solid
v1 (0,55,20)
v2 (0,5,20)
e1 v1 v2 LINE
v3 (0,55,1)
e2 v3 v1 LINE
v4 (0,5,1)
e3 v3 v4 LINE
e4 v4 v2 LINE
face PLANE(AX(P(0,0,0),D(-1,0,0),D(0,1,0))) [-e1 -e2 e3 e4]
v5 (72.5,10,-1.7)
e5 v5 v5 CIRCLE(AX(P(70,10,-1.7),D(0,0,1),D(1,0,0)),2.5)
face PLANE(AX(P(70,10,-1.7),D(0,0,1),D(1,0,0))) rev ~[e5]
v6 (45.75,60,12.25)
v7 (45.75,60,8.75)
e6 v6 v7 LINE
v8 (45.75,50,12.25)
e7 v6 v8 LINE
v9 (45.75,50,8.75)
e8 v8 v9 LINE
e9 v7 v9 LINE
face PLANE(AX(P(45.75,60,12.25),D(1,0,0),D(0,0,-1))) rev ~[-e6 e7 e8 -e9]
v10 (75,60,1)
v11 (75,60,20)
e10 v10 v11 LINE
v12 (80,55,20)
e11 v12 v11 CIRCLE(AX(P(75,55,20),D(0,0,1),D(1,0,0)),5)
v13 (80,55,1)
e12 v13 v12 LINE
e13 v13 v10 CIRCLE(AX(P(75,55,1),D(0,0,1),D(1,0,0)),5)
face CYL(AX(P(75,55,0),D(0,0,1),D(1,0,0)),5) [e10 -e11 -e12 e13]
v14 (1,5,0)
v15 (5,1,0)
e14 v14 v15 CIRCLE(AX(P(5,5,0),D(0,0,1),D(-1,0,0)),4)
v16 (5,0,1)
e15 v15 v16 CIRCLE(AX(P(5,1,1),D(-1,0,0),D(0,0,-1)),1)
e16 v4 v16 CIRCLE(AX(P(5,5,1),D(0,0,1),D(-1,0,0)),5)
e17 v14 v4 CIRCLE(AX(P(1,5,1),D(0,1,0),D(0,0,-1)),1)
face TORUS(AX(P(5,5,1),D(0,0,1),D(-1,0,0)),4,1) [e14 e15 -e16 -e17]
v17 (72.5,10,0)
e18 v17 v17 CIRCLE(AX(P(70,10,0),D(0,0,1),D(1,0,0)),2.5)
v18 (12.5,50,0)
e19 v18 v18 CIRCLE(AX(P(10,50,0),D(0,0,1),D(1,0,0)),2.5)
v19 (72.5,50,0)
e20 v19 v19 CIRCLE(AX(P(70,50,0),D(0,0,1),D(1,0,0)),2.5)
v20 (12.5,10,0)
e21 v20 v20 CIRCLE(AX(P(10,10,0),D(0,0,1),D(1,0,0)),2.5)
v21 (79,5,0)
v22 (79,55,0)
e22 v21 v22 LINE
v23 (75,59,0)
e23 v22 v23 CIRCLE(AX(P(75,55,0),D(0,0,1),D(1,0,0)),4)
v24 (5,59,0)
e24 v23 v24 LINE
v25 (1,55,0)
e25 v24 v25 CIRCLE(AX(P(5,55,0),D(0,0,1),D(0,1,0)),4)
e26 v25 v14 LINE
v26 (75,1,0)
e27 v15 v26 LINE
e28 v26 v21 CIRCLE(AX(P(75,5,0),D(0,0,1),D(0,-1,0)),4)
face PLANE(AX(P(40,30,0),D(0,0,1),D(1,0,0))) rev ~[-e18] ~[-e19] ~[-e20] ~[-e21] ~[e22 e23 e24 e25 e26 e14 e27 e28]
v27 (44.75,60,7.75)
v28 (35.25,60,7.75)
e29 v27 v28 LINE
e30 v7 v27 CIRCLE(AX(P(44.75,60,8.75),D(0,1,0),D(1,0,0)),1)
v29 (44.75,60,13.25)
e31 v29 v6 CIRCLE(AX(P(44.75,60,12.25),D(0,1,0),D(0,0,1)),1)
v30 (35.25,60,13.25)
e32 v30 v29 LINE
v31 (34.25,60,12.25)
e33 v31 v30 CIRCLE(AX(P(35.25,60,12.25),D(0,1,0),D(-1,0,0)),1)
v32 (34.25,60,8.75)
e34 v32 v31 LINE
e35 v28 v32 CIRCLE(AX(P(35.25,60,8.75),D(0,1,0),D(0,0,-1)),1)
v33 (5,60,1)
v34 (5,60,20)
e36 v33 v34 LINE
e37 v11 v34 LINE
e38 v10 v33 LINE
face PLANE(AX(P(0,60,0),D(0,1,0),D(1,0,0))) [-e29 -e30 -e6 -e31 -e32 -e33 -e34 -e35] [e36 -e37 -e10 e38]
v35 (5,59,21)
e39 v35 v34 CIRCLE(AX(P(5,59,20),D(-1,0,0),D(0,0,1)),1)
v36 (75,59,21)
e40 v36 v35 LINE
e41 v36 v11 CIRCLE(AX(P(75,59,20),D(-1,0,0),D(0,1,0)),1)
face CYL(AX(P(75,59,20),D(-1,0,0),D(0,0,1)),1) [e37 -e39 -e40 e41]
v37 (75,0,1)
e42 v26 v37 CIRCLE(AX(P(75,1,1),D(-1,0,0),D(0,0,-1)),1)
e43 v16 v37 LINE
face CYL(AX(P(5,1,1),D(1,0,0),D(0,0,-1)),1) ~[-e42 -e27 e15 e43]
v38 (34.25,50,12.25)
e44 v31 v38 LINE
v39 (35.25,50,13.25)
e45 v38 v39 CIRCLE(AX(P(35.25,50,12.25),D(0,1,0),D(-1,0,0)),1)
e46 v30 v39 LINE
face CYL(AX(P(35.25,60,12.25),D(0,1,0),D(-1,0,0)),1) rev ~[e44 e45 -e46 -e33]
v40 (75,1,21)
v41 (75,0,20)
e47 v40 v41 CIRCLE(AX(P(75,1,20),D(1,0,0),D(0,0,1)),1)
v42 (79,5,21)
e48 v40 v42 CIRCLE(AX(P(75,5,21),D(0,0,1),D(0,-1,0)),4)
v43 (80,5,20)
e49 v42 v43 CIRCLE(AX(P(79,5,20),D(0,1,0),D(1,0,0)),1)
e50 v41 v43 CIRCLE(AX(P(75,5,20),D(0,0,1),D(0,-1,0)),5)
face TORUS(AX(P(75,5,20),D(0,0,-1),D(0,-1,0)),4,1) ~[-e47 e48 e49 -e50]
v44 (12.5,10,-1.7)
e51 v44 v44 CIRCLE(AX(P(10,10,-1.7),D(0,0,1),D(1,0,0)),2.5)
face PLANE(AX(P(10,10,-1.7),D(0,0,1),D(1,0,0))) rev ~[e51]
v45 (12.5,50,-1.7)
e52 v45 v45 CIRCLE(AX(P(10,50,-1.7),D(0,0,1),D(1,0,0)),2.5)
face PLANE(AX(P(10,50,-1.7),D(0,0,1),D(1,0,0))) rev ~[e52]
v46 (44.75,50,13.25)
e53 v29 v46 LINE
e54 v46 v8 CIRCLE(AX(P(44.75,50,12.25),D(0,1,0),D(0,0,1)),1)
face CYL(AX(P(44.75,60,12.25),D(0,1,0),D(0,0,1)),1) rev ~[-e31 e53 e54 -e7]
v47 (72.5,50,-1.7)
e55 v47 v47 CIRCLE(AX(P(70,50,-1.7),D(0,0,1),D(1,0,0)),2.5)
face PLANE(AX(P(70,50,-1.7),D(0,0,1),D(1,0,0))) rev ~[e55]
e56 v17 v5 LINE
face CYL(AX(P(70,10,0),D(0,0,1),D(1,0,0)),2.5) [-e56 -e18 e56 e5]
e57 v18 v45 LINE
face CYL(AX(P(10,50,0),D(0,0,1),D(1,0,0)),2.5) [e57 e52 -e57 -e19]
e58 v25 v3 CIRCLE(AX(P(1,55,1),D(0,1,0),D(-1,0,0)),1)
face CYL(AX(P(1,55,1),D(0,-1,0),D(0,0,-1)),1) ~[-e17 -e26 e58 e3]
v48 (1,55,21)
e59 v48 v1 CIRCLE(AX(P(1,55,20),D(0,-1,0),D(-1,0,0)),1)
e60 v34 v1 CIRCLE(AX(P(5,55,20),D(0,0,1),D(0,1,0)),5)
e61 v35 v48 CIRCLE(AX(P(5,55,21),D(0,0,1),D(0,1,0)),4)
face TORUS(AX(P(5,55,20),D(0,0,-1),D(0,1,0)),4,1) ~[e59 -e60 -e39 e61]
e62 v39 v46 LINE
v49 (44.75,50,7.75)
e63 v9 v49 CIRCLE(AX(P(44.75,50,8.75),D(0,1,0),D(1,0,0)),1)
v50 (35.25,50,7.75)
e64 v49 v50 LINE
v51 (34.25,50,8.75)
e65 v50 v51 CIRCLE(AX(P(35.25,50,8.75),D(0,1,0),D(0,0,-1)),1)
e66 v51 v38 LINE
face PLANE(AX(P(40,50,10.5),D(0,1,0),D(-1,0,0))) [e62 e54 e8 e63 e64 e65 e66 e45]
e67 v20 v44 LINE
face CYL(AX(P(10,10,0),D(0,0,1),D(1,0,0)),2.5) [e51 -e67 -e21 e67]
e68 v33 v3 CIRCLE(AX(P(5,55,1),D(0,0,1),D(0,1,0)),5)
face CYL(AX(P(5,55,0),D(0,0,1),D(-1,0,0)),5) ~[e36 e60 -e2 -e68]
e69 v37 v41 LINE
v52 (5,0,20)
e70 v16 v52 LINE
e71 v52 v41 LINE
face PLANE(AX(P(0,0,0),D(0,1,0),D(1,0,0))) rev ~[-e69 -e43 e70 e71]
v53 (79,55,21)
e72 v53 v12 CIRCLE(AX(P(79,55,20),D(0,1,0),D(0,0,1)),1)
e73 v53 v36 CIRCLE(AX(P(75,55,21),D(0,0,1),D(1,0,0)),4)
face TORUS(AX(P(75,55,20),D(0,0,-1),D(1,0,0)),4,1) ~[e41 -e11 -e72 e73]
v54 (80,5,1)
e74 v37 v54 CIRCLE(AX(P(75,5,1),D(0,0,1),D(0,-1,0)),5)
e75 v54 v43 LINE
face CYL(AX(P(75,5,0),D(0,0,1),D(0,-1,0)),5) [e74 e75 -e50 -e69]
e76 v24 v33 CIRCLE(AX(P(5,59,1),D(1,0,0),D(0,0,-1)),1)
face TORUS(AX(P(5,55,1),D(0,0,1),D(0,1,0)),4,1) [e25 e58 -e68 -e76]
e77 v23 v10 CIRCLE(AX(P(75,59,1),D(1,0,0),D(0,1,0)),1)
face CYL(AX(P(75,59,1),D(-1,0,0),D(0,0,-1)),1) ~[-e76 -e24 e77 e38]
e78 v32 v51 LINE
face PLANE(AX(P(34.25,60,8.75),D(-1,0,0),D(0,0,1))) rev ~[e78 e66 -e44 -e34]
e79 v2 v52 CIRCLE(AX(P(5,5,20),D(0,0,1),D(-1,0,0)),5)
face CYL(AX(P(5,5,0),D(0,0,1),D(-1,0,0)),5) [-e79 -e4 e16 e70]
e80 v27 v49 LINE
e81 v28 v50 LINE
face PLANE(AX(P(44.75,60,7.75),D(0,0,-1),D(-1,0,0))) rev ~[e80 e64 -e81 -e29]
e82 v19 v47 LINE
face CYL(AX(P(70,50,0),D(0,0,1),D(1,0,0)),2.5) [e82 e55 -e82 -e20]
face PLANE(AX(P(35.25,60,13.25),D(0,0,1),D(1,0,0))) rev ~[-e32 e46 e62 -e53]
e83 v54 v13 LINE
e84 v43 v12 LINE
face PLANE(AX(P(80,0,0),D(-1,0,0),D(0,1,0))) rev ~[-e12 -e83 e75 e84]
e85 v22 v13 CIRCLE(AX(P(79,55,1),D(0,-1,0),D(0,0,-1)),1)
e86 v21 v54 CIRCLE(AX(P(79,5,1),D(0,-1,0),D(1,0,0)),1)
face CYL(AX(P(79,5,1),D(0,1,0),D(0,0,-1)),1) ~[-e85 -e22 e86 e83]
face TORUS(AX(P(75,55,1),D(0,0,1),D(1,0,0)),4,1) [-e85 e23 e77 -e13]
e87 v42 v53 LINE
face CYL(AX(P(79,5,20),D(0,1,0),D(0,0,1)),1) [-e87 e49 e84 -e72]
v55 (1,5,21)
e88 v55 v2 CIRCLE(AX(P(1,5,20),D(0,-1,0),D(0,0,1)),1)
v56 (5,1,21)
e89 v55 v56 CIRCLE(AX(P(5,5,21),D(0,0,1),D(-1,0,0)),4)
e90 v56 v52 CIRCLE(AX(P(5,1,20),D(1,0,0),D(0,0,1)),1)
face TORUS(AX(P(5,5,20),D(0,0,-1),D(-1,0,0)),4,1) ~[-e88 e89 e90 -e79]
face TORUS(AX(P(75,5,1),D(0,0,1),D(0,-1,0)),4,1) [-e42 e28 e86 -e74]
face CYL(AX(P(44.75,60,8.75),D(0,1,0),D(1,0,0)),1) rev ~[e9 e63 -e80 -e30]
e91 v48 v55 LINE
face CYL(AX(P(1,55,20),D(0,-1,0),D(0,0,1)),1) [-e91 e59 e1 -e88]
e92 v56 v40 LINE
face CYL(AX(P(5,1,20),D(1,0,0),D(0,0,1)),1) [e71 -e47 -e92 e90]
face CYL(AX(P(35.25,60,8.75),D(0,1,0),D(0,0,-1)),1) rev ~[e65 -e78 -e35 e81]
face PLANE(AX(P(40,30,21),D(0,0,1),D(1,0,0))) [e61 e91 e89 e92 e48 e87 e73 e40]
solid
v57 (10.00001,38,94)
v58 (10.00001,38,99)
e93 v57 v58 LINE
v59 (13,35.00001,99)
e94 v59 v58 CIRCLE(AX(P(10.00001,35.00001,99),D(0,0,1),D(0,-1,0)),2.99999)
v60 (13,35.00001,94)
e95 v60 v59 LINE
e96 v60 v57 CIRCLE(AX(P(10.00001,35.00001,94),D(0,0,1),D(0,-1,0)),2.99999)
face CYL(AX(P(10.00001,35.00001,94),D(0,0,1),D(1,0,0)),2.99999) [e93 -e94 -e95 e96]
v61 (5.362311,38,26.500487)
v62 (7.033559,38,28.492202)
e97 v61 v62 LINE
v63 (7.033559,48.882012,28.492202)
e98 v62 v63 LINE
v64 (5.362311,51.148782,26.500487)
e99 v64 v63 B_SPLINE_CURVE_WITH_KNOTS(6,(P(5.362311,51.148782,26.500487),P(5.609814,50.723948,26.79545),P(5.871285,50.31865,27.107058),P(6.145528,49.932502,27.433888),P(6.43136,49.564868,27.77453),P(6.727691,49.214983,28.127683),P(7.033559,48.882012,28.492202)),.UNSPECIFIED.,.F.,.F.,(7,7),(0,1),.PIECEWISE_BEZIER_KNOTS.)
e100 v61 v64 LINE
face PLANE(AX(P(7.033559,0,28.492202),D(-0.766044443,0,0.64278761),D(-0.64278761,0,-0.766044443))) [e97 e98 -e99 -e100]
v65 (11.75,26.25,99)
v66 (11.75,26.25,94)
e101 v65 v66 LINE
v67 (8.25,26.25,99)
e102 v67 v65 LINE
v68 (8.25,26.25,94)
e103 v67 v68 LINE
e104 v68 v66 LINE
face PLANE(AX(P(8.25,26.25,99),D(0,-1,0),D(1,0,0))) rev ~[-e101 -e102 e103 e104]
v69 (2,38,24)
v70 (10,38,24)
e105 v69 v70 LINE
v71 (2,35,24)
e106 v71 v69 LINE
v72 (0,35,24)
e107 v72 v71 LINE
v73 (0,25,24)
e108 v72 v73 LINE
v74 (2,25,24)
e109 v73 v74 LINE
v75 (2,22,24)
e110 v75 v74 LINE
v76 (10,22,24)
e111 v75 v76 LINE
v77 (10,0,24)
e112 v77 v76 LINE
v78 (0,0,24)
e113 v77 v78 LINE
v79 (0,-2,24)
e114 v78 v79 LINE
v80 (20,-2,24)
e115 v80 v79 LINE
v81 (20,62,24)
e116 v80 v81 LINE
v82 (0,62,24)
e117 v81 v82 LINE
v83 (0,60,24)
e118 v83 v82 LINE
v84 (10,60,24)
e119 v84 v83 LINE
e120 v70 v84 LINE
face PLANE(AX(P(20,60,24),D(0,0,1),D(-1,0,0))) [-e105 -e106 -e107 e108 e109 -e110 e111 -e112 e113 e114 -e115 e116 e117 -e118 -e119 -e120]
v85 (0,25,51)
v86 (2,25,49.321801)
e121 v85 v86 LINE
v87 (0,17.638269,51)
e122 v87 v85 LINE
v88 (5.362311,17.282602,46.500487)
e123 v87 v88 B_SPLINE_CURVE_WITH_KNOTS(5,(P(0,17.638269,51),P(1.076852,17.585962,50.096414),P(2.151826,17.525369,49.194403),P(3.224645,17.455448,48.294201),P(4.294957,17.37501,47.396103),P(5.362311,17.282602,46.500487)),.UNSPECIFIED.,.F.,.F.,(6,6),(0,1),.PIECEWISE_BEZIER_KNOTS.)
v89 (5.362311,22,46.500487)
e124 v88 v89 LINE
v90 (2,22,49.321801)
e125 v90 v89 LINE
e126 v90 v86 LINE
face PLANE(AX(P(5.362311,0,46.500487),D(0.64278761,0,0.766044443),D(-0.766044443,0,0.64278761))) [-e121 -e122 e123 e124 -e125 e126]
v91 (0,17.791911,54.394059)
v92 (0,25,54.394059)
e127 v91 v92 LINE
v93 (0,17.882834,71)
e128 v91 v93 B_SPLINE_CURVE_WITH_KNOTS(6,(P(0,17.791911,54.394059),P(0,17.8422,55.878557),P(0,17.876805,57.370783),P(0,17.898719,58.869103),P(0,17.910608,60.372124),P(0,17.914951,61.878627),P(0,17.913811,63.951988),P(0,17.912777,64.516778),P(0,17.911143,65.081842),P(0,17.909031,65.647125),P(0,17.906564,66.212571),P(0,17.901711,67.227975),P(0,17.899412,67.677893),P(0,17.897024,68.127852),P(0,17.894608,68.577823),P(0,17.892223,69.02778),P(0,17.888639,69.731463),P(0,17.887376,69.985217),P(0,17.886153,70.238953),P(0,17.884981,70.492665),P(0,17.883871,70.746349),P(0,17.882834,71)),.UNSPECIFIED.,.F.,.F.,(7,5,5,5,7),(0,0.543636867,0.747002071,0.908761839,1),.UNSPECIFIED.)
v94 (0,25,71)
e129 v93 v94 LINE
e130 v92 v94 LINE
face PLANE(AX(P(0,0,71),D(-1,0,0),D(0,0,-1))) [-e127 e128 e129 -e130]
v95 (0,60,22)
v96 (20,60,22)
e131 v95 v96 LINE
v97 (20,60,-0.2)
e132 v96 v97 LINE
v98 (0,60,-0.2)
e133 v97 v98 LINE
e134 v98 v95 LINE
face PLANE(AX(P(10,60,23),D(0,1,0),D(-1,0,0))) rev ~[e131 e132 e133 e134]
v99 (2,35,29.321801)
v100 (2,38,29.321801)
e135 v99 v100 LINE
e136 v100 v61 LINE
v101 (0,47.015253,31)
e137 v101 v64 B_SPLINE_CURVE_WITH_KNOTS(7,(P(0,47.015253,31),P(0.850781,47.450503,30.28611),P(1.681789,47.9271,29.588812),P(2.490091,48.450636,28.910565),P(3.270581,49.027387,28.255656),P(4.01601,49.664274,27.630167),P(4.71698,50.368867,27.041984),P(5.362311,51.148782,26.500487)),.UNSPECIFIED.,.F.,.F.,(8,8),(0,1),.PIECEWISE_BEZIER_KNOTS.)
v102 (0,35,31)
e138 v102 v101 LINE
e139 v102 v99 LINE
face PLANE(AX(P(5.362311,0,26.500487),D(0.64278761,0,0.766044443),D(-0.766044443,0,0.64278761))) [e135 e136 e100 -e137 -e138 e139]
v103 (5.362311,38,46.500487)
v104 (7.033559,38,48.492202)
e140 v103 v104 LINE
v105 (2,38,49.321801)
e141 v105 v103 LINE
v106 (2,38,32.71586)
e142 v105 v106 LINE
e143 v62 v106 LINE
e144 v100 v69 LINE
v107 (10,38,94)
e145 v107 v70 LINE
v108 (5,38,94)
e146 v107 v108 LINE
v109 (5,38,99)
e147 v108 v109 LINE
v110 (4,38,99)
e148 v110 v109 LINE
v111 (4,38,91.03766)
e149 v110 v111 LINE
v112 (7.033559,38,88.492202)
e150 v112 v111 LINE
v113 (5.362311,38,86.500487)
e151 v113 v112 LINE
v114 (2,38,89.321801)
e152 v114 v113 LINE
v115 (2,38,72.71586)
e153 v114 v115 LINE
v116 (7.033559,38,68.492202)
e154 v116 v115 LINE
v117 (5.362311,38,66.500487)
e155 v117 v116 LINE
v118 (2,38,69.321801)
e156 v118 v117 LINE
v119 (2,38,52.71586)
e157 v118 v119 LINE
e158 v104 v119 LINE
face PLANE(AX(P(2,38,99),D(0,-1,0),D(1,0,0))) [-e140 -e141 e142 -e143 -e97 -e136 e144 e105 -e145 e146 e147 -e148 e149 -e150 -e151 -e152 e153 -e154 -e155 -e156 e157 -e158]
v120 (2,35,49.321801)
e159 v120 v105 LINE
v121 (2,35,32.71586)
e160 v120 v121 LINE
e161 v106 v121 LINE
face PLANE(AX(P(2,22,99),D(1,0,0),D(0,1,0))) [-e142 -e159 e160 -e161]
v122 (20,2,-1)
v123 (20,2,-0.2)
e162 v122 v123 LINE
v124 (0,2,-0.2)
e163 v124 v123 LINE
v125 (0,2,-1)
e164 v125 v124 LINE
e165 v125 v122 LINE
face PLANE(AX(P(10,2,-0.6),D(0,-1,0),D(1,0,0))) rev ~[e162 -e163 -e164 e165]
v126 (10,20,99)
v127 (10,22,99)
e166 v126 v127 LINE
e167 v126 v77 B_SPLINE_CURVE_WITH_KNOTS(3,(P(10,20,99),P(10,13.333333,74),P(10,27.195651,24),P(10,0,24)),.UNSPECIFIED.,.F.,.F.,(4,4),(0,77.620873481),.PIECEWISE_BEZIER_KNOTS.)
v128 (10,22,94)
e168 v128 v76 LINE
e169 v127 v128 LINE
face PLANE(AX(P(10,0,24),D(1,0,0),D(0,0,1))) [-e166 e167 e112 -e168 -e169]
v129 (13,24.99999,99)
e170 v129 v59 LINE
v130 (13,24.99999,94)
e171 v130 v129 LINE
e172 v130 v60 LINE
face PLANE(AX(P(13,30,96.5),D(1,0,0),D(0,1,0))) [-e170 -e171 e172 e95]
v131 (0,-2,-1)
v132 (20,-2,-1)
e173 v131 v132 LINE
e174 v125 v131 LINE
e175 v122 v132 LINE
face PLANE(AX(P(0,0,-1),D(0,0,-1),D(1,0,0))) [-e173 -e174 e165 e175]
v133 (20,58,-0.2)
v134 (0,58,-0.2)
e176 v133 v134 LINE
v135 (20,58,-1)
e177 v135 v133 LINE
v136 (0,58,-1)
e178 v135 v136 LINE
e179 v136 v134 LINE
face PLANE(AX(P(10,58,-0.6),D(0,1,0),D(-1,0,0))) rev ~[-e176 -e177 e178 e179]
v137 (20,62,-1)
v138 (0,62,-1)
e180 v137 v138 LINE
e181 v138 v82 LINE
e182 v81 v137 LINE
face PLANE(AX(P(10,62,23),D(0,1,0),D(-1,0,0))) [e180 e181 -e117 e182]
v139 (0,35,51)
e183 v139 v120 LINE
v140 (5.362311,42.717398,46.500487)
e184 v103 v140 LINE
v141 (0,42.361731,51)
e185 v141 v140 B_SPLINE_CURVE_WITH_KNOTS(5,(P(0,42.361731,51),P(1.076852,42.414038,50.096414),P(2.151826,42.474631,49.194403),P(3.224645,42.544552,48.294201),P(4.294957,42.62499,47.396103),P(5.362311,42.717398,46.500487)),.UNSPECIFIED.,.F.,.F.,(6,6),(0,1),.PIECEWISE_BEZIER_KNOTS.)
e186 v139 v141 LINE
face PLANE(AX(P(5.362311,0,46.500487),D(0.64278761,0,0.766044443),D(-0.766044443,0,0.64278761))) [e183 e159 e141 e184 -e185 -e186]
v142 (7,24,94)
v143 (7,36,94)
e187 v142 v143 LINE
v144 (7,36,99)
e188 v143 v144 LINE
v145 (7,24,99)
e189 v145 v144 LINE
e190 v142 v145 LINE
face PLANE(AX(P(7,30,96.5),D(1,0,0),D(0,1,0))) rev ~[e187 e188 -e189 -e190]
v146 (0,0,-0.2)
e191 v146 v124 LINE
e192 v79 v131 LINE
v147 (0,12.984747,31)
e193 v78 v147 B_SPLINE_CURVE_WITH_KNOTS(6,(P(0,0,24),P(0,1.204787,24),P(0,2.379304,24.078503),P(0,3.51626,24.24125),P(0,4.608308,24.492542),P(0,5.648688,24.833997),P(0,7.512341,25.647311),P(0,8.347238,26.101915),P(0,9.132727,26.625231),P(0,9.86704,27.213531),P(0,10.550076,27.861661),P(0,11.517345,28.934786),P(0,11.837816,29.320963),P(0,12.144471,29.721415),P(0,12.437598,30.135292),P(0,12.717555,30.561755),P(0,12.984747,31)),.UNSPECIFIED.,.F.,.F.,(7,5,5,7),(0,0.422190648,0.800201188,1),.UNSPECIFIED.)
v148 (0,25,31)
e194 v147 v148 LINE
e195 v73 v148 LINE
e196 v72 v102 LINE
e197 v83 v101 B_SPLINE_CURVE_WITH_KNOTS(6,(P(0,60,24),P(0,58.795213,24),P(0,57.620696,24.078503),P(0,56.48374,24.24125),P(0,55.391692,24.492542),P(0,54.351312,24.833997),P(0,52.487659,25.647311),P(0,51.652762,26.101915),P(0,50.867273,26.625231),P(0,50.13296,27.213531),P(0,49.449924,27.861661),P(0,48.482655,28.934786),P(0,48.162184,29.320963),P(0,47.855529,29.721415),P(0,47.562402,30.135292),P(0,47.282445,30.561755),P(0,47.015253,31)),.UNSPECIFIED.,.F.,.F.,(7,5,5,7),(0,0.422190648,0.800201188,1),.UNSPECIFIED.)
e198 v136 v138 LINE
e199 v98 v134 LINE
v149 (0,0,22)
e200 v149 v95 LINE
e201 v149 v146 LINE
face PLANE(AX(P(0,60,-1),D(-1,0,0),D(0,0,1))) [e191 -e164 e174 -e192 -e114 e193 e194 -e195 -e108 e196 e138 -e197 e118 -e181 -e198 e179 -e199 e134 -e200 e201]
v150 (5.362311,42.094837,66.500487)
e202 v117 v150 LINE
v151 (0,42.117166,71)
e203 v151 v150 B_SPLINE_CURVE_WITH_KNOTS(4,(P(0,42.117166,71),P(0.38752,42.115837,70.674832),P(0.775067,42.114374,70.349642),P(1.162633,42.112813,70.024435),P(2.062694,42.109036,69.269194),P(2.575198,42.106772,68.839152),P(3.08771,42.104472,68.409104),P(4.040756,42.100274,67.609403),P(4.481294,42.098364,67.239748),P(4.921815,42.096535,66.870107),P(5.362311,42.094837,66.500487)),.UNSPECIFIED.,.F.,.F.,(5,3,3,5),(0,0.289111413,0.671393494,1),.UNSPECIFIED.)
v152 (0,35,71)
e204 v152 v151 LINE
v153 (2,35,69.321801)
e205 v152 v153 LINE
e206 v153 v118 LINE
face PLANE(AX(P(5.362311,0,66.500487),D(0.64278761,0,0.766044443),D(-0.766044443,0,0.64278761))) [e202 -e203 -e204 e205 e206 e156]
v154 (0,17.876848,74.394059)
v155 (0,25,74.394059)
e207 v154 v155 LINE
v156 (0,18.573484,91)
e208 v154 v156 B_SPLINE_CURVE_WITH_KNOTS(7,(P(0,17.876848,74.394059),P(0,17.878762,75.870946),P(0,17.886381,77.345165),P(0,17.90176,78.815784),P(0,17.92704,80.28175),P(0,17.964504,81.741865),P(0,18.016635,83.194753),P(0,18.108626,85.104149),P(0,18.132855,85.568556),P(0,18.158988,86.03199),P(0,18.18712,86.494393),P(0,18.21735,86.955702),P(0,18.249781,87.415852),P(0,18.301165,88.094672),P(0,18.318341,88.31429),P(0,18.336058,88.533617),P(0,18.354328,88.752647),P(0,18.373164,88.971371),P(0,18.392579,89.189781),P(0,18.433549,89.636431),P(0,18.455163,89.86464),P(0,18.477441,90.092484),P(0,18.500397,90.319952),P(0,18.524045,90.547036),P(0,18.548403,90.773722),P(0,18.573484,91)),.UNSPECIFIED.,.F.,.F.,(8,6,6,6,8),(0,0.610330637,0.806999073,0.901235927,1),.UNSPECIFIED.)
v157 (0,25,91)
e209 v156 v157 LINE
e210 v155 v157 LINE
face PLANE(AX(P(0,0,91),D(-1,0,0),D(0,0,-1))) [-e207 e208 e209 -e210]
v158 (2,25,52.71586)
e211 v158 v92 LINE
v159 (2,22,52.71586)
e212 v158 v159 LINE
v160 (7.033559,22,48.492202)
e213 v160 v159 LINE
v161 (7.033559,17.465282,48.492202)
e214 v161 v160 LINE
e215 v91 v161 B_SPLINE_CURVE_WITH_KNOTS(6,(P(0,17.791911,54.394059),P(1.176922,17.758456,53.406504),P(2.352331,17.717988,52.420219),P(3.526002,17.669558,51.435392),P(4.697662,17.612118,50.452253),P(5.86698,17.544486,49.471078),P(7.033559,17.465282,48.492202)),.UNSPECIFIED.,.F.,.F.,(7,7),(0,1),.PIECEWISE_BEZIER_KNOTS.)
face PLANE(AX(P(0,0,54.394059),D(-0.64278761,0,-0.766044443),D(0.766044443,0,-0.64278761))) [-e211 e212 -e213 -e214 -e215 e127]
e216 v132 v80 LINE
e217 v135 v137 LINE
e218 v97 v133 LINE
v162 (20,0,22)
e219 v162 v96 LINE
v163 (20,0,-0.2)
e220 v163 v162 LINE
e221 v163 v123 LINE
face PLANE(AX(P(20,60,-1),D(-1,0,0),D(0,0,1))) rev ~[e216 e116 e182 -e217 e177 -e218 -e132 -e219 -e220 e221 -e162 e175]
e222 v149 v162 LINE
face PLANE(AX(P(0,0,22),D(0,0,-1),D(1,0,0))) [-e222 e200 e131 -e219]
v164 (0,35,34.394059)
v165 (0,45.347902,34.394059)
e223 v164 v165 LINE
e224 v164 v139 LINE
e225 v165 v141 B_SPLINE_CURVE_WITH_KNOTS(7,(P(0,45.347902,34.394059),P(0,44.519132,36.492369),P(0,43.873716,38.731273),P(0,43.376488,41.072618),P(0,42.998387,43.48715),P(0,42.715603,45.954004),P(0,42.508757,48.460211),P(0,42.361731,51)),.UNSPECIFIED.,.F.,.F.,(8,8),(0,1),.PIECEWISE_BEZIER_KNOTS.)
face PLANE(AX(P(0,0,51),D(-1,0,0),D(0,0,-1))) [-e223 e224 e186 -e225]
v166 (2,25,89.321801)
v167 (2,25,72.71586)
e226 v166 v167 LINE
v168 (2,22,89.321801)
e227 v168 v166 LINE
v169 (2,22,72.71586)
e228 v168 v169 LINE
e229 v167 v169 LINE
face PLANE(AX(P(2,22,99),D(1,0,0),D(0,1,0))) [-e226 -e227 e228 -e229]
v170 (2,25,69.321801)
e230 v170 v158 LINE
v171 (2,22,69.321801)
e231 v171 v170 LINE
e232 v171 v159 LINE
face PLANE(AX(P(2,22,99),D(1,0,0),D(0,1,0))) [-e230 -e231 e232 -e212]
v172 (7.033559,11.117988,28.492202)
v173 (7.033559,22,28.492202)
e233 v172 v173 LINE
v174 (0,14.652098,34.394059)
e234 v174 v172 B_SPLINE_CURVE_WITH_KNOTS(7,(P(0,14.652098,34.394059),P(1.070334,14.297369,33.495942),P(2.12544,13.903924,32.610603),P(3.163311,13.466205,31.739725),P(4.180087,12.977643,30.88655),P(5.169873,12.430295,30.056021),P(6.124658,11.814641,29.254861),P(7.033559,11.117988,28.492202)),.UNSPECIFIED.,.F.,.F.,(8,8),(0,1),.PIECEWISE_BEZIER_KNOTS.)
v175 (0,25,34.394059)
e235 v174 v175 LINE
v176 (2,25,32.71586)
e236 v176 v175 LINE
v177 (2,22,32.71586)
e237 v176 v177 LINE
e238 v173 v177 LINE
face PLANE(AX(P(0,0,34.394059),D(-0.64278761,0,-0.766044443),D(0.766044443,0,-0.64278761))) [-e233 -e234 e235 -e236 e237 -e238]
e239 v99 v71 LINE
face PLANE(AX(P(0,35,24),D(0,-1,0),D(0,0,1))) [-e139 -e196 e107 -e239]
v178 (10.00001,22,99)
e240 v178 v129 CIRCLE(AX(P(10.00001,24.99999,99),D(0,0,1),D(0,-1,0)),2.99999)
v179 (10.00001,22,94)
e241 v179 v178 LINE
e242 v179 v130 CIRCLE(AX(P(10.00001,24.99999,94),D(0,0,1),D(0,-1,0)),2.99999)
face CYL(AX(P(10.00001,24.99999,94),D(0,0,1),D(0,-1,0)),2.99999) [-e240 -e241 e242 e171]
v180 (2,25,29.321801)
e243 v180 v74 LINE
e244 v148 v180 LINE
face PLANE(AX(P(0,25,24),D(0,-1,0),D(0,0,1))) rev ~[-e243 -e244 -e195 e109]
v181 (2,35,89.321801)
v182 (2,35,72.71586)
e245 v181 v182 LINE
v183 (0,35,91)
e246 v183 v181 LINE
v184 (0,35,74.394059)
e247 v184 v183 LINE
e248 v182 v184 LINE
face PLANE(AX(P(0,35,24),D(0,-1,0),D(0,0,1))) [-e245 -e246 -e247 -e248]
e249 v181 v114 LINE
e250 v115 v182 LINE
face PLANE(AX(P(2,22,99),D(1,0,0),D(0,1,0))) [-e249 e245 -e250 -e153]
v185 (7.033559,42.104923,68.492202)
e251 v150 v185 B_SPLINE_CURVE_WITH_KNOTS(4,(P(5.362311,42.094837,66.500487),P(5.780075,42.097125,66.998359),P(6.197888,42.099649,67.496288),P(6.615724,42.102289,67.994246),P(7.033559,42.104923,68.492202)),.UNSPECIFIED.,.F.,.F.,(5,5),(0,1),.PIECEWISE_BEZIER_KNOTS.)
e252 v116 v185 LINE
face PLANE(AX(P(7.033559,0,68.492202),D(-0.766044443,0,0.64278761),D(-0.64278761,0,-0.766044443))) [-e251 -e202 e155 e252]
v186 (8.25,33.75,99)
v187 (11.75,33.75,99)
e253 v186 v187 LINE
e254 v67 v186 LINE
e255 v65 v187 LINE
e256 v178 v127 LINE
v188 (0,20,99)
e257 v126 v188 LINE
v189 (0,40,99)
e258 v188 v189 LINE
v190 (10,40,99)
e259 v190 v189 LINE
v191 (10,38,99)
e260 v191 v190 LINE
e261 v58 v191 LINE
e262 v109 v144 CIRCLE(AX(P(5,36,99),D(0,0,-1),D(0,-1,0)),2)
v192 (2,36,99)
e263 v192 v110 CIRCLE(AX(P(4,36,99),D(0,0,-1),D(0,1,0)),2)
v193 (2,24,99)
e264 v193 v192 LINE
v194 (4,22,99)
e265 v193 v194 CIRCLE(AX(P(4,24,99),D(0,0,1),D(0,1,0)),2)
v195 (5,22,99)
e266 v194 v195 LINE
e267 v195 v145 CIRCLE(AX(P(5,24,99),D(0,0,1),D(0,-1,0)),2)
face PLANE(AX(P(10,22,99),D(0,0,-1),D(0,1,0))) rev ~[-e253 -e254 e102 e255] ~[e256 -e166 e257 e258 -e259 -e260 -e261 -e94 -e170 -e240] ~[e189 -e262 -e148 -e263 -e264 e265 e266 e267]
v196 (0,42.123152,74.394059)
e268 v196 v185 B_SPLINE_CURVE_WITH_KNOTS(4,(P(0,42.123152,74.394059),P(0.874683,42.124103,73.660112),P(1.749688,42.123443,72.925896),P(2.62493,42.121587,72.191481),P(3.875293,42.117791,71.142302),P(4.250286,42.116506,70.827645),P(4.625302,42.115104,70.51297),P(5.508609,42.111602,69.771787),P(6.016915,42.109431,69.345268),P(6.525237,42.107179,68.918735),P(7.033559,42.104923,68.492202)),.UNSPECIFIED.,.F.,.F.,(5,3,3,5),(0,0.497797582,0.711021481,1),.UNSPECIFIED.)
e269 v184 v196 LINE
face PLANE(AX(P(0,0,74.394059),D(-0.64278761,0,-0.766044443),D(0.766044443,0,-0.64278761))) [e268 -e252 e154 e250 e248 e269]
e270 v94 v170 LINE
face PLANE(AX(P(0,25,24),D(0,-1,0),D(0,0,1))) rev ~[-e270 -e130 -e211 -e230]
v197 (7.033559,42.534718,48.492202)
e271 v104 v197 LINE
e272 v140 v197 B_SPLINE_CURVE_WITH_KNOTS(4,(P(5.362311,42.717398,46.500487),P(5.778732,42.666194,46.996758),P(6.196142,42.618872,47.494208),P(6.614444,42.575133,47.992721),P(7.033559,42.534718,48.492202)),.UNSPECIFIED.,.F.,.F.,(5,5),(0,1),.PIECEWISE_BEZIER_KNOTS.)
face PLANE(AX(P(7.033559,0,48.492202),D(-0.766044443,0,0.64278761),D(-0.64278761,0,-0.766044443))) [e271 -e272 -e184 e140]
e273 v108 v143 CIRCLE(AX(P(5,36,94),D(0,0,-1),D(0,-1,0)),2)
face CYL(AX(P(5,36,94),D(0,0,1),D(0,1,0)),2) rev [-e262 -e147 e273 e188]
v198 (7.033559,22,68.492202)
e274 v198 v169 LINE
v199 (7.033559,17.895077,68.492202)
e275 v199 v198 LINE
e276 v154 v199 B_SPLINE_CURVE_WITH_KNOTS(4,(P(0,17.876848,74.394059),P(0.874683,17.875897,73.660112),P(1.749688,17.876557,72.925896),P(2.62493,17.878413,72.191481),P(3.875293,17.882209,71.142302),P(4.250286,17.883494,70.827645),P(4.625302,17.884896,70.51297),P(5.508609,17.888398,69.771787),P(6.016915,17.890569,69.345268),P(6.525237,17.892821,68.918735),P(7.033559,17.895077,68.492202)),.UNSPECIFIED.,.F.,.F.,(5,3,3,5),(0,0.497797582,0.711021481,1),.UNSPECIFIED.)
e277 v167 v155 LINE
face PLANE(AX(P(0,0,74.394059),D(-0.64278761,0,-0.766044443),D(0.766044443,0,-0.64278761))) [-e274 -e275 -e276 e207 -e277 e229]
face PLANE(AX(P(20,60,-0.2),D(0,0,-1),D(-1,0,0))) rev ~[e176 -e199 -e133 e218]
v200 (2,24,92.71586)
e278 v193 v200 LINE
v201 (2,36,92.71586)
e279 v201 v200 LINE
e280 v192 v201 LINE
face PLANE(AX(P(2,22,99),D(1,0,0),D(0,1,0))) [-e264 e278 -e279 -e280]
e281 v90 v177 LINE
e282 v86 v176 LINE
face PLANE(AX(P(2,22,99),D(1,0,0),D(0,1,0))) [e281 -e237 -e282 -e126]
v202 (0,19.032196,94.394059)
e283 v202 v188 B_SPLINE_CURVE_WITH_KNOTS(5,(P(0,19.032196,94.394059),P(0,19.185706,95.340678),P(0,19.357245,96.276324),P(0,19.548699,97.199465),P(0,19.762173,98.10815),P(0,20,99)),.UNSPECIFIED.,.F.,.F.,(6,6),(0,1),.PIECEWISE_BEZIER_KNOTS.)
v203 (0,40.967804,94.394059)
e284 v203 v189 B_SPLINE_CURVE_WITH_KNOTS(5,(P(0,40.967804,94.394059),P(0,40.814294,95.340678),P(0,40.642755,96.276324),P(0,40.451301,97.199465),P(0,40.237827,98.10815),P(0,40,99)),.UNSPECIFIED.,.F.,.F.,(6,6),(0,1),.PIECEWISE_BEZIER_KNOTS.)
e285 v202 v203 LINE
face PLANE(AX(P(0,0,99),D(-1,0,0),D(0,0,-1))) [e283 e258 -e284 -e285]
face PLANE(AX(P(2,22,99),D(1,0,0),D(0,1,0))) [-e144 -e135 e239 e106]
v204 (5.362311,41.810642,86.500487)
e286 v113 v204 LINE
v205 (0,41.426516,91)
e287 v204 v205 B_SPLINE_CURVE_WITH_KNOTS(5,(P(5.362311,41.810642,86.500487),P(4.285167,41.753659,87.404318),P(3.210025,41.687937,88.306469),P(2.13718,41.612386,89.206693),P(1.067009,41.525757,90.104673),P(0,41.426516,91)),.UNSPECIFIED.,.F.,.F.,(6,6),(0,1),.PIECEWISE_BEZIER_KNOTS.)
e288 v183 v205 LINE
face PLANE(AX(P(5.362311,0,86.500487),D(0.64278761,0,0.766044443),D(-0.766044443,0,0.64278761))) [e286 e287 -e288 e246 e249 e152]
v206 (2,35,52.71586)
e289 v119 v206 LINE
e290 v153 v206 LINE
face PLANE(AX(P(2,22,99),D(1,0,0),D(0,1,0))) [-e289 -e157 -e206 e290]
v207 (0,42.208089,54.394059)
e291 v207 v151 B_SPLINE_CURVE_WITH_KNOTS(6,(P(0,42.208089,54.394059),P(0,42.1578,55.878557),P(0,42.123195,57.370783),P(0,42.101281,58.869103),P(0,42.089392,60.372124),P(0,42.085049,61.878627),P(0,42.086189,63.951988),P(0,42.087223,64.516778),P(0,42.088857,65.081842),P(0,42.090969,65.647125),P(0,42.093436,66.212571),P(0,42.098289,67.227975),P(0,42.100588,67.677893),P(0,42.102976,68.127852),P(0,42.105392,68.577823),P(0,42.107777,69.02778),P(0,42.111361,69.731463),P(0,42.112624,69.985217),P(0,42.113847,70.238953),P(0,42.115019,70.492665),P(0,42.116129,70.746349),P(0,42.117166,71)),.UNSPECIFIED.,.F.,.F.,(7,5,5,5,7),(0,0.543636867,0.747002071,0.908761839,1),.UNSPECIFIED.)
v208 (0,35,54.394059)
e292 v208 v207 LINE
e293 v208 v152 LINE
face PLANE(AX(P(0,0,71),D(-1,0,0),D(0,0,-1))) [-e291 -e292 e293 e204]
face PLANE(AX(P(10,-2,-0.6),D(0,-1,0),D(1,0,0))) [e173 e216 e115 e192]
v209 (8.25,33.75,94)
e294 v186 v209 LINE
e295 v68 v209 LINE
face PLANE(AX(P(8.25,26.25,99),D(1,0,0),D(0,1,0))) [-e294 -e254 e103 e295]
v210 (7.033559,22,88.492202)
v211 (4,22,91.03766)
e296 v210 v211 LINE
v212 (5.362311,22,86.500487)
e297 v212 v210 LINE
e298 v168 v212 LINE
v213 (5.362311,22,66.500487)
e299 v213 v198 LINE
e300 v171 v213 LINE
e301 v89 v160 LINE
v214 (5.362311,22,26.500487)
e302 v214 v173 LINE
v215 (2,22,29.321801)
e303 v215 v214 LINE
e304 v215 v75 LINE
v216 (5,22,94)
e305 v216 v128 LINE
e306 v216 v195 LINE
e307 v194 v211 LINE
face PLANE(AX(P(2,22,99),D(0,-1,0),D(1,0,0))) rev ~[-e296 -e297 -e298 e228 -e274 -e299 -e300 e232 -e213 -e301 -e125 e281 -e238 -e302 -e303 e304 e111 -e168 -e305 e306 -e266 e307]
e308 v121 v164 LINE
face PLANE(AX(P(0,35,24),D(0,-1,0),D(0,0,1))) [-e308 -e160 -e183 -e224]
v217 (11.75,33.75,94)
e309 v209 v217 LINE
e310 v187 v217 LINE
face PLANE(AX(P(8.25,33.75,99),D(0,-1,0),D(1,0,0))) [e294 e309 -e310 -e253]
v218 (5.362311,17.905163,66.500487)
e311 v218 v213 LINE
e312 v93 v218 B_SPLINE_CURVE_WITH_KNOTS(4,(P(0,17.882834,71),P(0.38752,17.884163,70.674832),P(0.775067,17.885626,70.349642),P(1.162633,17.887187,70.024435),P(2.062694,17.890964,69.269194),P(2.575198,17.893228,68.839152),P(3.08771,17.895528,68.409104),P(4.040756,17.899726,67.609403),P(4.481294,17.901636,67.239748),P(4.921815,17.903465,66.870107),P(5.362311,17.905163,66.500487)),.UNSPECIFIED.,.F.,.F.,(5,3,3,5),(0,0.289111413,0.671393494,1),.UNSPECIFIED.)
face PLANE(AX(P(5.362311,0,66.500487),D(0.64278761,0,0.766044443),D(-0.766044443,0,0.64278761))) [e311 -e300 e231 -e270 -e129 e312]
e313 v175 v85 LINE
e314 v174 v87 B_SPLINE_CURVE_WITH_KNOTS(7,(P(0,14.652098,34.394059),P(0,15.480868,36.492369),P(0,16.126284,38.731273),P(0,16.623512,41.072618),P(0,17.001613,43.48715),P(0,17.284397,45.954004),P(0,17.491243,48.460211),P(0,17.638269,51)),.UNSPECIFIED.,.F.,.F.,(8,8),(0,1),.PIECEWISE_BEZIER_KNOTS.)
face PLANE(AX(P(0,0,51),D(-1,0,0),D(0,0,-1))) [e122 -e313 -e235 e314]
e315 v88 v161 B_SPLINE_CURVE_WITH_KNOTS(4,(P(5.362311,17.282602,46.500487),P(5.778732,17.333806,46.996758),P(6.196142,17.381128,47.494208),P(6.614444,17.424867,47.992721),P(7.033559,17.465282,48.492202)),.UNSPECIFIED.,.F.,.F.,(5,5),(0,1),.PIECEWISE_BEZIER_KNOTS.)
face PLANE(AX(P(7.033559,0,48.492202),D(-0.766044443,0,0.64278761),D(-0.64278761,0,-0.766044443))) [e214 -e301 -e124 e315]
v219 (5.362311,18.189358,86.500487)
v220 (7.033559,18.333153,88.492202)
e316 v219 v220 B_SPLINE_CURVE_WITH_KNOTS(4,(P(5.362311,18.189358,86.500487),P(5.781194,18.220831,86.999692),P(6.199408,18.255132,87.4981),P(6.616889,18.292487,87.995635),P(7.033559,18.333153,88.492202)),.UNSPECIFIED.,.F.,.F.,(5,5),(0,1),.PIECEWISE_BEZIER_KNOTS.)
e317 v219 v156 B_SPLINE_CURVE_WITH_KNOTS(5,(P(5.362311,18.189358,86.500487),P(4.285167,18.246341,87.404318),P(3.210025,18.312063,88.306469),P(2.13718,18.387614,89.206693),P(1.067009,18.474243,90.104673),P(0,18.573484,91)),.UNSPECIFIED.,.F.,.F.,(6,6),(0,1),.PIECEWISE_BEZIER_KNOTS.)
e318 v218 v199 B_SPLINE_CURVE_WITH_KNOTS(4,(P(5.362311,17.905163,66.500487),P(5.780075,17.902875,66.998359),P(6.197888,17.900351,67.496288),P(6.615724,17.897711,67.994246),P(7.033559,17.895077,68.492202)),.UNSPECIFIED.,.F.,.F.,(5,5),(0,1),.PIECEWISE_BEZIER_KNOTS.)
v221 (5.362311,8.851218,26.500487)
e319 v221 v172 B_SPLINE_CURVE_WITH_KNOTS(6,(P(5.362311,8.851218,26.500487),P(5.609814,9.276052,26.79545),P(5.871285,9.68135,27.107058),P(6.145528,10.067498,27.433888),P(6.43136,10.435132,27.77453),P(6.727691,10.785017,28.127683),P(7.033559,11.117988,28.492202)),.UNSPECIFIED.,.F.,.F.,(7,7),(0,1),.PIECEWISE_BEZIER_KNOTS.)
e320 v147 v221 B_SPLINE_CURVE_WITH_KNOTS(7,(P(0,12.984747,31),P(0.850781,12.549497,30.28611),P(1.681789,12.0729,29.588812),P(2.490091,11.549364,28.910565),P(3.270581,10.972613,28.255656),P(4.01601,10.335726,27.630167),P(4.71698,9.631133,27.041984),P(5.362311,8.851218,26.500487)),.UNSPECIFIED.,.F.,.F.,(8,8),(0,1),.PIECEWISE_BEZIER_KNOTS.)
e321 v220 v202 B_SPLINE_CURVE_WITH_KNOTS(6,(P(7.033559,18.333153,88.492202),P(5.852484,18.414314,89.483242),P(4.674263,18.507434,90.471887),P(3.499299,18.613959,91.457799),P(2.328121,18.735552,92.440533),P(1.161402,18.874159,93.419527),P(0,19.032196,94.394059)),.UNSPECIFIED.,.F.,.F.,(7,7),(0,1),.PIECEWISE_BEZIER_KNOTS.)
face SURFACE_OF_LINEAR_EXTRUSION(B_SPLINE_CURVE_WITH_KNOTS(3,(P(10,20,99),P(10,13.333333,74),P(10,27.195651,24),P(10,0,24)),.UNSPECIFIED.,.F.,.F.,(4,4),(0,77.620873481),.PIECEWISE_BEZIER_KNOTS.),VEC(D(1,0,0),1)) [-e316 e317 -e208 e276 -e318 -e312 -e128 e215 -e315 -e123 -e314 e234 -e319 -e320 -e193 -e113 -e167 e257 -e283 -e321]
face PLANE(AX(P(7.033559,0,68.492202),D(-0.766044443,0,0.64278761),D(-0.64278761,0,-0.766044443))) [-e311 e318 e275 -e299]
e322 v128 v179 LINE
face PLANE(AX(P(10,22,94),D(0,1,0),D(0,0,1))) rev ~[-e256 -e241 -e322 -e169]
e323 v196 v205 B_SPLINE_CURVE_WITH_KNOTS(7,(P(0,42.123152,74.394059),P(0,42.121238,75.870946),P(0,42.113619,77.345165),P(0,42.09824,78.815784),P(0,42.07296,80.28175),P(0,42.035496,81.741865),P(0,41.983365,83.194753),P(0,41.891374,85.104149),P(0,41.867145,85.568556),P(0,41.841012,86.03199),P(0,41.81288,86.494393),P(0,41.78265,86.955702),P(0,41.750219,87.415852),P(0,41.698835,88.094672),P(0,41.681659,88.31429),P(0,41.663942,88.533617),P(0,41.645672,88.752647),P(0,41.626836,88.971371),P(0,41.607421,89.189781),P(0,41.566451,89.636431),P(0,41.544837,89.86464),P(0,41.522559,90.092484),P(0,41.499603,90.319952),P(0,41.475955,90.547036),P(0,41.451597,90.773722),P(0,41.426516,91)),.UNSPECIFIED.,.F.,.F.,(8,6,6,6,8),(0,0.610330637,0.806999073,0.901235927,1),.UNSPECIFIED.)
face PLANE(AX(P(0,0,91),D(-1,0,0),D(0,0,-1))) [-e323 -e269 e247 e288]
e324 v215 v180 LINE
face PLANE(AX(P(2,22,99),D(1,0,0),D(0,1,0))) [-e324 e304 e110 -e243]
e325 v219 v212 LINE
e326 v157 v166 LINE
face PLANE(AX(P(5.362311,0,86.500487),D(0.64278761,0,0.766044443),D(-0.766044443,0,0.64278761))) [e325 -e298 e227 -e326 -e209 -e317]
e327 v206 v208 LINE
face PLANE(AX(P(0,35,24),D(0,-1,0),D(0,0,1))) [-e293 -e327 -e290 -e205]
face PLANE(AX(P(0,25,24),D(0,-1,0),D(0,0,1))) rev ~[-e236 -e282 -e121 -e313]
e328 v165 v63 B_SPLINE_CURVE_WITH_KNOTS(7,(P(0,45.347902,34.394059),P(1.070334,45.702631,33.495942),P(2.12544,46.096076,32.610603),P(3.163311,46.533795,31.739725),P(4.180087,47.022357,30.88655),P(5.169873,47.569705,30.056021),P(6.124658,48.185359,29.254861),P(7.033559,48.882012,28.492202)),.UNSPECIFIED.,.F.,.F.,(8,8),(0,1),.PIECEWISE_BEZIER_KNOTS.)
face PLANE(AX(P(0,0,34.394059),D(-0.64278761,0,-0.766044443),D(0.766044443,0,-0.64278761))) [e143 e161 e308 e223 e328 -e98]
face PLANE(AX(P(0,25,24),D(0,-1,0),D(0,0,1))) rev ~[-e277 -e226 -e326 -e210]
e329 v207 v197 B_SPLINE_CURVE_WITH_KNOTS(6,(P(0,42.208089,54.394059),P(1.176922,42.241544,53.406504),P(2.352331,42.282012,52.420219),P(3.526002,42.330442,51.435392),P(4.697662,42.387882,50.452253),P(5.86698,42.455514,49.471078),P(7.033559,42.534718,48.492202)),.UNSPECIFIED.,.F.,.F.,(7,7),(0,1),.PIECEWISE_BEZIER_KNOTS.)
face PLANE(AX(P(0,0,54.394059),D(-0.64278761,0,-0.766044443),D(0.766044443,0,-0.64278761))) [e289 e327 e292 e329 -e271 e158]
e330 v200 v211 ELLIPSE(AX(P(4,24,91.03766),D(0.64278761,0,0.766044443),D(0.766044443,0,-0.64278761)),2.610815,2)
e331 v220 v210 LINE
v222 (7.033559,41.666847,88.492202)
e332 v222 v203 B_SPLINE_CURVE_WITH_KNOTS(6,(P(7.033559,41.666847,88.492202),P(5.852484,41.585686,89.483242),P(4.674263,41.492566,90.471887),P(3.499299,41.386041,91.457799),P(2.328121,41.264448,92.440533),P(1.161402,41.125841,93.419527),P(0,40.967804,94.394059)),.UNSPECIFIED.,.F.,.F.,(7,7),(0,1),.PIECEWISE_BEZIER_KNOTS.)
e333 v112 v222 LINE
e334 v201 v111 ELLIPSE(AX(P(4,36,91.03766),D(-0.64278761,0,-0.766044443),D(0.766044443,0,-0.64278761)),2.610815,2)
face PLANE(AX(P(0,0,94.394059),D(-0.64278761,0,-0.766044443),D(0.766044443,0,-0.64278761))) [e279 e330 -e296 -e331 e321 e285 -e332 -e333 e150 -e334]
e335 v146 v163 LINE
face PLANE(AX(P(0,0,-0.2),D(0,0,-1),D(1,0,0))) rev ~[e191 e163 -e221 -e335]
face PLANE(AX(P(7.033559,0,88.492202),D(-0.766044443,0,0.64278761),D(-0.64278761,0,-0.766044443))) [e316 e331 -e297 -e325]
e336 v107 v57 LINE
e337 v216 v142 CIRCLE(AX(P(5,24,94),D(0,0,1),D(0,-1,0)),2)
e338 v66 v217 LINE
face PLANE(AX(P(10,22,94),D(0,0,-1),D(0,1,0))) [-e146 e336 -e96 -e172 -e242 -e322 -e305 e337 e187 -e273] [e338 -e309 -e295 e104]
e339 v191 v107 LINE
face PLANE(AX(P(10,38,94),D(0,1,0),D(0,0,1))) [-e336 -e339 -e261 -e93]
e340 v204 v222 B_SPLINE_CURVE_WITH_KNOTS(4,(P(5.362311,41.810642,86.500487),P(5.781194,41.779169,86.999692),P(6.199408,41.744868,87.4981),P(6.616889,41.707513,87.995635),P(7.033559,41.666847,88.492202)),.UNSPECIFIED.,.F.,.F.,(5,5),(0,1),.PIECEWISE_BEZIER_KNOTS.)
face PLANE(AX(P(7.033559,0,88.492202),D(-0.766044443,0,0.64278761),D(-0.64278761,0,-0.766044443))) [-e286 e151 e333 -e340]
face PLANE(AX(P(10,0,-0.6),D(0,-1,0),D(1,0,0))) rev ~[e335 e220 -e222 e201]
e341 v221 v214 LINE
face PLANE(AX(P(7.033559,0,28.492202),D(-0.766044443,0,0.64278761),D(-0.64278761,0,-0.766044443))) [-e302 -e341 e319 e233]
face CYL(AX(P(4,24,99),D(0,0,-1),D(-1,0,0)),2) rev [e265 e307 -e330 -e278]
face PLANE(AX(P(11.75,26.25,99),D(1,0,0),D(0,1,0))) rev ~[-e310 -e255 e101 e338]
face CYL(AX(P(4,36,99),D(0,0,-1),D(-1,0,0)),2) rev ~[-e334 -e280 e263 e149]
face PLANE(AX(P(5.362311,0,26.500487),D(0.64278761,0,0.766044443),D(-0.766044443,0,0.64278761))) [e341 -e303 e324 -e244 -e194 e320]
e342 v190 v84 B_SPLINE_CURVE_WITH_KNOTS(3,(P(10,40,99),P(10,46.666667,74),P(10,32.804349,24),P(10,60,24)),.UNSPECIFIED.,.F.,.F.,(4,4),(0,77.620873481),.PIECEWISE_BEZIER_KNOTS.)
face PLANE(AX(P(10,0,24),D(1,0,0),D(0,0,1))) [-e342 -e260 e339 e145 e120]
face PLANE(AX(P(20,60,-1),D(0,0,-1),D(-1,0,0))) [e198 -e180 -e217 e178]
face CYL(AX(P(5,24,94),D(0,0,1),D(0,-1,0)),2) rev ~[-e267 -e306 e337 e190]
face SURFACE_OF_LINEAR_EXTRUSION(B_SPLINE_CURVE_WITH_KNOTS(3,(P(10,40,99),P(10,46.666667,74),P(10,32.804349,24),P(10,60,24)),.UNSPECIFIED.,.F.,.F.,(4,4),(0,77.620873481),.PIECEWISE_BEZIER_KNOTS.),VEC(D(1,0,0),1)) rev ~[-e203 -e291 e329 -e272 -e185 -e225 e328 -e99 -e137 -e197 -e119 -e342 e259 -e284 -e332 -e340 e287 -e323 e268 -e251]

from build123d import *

# Parameters (mm, degrees)
F0_W      = 80
F0_H      = 60
F0_R      = 2.5
F1_DEPTH  = 21
F2_R      = 5
F3_R      = 1
F5_DEPTH  = 10
F6_DEPTH  = 1.7
F7_W      = 20
F7_H      = 0.8
F7_H_2    = 22.2
F8_DEPTH  = 2
F9_DEPTH  = 60
F10_W     = 20
F10_H     = 2
F10_H_2   = 22.2
F10_H_3   = 0.8
F11_DEPTH = 2
F13_DEPTH = 25
F14_W     = 8
F14_H     = 16
F15_DEPTH = 75
F16_W     = 16
F16_H     = 5
F17_DEPTH = 3
F18_R     = 2.99999
F19_W     = 3.5
F19_H     = 7.5
F20_DEPTH = 5
F21_W     = 10
F21_H     = 67
F22_DEPTH = 25
F23_DEPTH = 2
F24_DEPTH = 2
F25_R     = 2


# Not quite as in the source:
# - a fillet or chamfer is up to 0.001 mm smaller than in the source, because OpenCascade refuses the exact size


with BuildPart() as f1:
    # F0 (on Top) → F1 (new body)
    with BuildSketch(Plane.XY):
        with Locations((40, 30)):
            Rectangle(F0_W, F0_H)
        with Locations((10, 10)):
            Circle(F0_R, mode=Mode.SUBTRACT)
        with Locations((70, 10)):
            Circle(F0_R, mode=Mode.SUBTRACT)
        with Locations((10, 50)):
            Circle(F0_R, mode=Mode.SUBTRACT)
        with Locations((70, 50)):
            Circle(F0_R, mode=Mode.SUBTRACT)
        with Locations((10, 10)):
            Circle(F0_R)
        with Locations((70, 10)):
            Circle(F0_R)
        with Locations((70, 50)):
            Circle(F0_R)
        with Locations((10, 50)):
            Circle(F0_R)
    extrude(amount=F1_DEPTH)

    # F2
    f2_edges = [f1.edges().sort_by_distance(p)[0] for p in [
        (0, 0, 10.5),
        (80, 0, 10.5),
        (80, 60, 10.5),
        (0, 60, 10.5),
    ]]
    fillet(f2_edges, radius=F2_R)

    # F3
    f3_edges = [f1.edges().sort_by_distance(p)[0] for p in [
        (40, 0, 21),
        (40, 0, 0),
        (0, 30, 0),
        (0, 30, 21),
        (1.464466, 58.535534, 0),
        (1.464466, 1.464466, 0),
        (78.535534, 58.535534, 0),
        (78.535534, 1.464466, 0),
        (80, 30, 0),
        (1.464466, 58.535534, 21),
        (1.464466, 1.464466, 21),
        (78.535534, 58.535534, 21),
        (78.535534, 1.464466, 21),
        (80, 30, 21),
    ]]
    fillet(f3_edges, radius=F3_R)

    # F4 (on face) → F5 (cut)
    with BuildSketch(Plane(origin=(0, 60, 0), x_dir=(-1, 0, 0), z_dir=(0, 1, 0))):
        with BuildLine():
            Line((-35.25, 13.25), (-44.75, 13.25))
            ThreePointArc((-44.75, 13.25), (-45.4571067812, 12.9571067812), (-45.75, 12.25))
            Line((-45.75, 12.25), (-45.75, 8.75))
            ThreePointArc((-45.75, 8.75), (-45.4571067812, 8.0428932188), (-44.75, 7.75))
            Line((-44.75, 7.75), (-35.25, 7.75))
            ThreePointArc((-35.25, 7.75), (-34.5428932188, 8.0428932188), (-34.25, 8.75))
            Line((-34.25, 8.75), (-34.25, 12.25))
            ThreePointArc((-34.25, 12.25), (-34.5428932188, 12.9571067812), (-35.25, 13.25))
        make_face()
    extrude(amount=-F5_DEPTH, mode=Mode.SUBTRACT)

    # F0 (on Top) → F6 (join)
    with BuildSketch(Plane.XY):
        with Locations((10, 10)):
            Circle(F0_R)
        with Locations((70, 10)):
            Circle(F0_R)
        with Locations((70, 50)):
            Circle(F0_R)
        with Locations((10, 50)):
            Circle(F0_R)
    extrude(amount=-F6_DEPTH)


with BuildPart() as f8:
    # F7 (on Front) → F8 (new body)
    with BuildSketch(Plane.XZ):
        with Locations((10, -0.6)):
            Rectangle(F7_W, F7_H)
        Polygon((0, 24), (0, 22), (20, 22), (20, 24), (10, 24), align=None)
        with Locations((10, 10.9)):
            Rectangle(F7_W, F7_H_2)
    extrude(amount=F8_DEPTH)

    # F7 (on Front) → F9 (join, through all)
    with BuildSketch(Plane.XZ):
        Polygon((0, 24), (0, 22), (20, 22), (20, 24), (10, 24), align=None)
        Polygon((0, 31), (0, 24), (10, 24), (10, 99), (0, 99), (0, 94.3940589523), (7.033558887, 88.4922022843), (5.3623111018, 86.5004867322), (0, 91), (0, 74.3940589523), (7.033558887, 68.4922022843), (5.3623111018, 66.5004867322), (0, 71), (0, 54.3940589523), (7.033558887, 48.4922022843), (5.3623111018, 46.5004867322), (0, 51), (0, 34.3940589523), (7.033558887, 28.4922022843), (5.3623111018, 26.5004867322), align=None)
    extrude(amount=-F9_DEPTH)

    # F10 (on face) → F11 (join)
    with BuildSketch(Plane(origin=(0, 60, 0), x_dir=(-1, 0, 0), z_dir=(0, 1, 0))):
        with Locations((-10, 23)):
            Rectangle(F10_W, F10_H)
        with Locations((-10, 10.9)):
            Rectangle(F10_W, F10_H_2)
        with Locations((-10, -0.6)):
            Rectangle(F10_W, F10_H_3)
    extrude(amount=F11_DEPTH)

    # F12 (on face) → F13 (cut)
    with BuildSketch(Plane.YZ.offset(10)):
        with BuildLine():
            Line((0, 99), (0, 24))
            add(Edge.make_bspline(
                [(20, 99), (13.3333333333, 74), (27.1956510843, 24), (0, 24)],
                knots=[0, 0, 0, 0, 77.6208734813, 77.6208734813, 77.6208734813, 77.6208734813], degree=3))
            Line((20, 99), (3e-10, 99))
        make_face()
        with BuildLine():
            add(Edge.make_bspline(
                [(40, 99), (46.6666666667, 74), (32.8043489157, 24), (60, 24)],
                knots=[0, 0, 0, 0, 77.6208734813, 77.6208734813, 77.6208734813, 77.6208734813], degree=3))
            Line((60, 24), (60, 99))
            Line((60, 99), (40, 99))
        make_face()
    extrude(amount=-F13_DEPTH, mode=Mode.SUBTRACT)

    # F14 (on face) → F15 (cut, through all)
    with BuildSketch(Plane.XY.offset(99)):
        with Locations((6, 30)):
            Rectangle(F14_W, F14_H)
    extrude(amount=-F15_DEPTH, mode=Mode.SUBTRACT)

    # F16 (on face) → F17 (join, symmetric)
    with BuildSketch(Plane.YZ.offset(10)):
        with Locations((30, 96.5)):
            Rectangle(F16_W, F16_H)
    extrude(amount=F17_DEPTH, both=True)

    # F18 (radius 3 in the source; OpenCascade refuses exactly that, so slightly less here)
    f18_edges = [f8.edges().sort_by_distance(p)[0] for p in [
        (13, 22, 96.5),
        (13, 38, 96.5),
    ]]
    fillet(f18_edges, radius=F18_R)

    # F19 (on face) → F20 (cut, through all)
    with BuildSketch(Plane.XY.offset(99)):
        with Locations((10, 30)):
            Rectangle(F19_W, F19_H)
    extrude(amount=-F20_DEPTH, mode=Mode.SUBTRACT)

    # F21 (on face) → F22 (cut)
    with BuildSketch(Plane(origin=(0, 0, 0), x_dir=(0, -1, 0), z_dir=(-1, 0, 0))):
        with Locations((-30, 57.5)):
            Rectangle(F21_W, F21_H)
    extrude(amount=-F22_DEPTH, mode=Mode.SUBTRACT)

    # F7 (on Front) → F23 (join)
    with BuildSketch(Plane.XZ):
        with Locations((10, -0.6)):
            Rectangle(F7_W, F7_H)
    extrude(amount=-F23_DEPTH)

    # F10 (on face) → F24 (join)
    with BuildSketch(Plane(origin=(0, 60, 0), x_dir=(-1, 0, 0), z_dir=(0, 1, 0))):
        with Locations((-10, -0.6)):
            Rectangle(F10_W, F10_H_3)
    extrude(amount=-F24_DEPTH)

    # F25
    f25_edges = [f8.edges().sort_by_distance(p)[0] for p in [
        (7, 38, 96.5),
        (2, 38, 95.85793),
        (2, 22, 95.85793),
        (7, 22, 96.5),
    ]]
    fillet(f25_edges, radius=F25_R)


solid = Compound([f1.part, f8.part])
